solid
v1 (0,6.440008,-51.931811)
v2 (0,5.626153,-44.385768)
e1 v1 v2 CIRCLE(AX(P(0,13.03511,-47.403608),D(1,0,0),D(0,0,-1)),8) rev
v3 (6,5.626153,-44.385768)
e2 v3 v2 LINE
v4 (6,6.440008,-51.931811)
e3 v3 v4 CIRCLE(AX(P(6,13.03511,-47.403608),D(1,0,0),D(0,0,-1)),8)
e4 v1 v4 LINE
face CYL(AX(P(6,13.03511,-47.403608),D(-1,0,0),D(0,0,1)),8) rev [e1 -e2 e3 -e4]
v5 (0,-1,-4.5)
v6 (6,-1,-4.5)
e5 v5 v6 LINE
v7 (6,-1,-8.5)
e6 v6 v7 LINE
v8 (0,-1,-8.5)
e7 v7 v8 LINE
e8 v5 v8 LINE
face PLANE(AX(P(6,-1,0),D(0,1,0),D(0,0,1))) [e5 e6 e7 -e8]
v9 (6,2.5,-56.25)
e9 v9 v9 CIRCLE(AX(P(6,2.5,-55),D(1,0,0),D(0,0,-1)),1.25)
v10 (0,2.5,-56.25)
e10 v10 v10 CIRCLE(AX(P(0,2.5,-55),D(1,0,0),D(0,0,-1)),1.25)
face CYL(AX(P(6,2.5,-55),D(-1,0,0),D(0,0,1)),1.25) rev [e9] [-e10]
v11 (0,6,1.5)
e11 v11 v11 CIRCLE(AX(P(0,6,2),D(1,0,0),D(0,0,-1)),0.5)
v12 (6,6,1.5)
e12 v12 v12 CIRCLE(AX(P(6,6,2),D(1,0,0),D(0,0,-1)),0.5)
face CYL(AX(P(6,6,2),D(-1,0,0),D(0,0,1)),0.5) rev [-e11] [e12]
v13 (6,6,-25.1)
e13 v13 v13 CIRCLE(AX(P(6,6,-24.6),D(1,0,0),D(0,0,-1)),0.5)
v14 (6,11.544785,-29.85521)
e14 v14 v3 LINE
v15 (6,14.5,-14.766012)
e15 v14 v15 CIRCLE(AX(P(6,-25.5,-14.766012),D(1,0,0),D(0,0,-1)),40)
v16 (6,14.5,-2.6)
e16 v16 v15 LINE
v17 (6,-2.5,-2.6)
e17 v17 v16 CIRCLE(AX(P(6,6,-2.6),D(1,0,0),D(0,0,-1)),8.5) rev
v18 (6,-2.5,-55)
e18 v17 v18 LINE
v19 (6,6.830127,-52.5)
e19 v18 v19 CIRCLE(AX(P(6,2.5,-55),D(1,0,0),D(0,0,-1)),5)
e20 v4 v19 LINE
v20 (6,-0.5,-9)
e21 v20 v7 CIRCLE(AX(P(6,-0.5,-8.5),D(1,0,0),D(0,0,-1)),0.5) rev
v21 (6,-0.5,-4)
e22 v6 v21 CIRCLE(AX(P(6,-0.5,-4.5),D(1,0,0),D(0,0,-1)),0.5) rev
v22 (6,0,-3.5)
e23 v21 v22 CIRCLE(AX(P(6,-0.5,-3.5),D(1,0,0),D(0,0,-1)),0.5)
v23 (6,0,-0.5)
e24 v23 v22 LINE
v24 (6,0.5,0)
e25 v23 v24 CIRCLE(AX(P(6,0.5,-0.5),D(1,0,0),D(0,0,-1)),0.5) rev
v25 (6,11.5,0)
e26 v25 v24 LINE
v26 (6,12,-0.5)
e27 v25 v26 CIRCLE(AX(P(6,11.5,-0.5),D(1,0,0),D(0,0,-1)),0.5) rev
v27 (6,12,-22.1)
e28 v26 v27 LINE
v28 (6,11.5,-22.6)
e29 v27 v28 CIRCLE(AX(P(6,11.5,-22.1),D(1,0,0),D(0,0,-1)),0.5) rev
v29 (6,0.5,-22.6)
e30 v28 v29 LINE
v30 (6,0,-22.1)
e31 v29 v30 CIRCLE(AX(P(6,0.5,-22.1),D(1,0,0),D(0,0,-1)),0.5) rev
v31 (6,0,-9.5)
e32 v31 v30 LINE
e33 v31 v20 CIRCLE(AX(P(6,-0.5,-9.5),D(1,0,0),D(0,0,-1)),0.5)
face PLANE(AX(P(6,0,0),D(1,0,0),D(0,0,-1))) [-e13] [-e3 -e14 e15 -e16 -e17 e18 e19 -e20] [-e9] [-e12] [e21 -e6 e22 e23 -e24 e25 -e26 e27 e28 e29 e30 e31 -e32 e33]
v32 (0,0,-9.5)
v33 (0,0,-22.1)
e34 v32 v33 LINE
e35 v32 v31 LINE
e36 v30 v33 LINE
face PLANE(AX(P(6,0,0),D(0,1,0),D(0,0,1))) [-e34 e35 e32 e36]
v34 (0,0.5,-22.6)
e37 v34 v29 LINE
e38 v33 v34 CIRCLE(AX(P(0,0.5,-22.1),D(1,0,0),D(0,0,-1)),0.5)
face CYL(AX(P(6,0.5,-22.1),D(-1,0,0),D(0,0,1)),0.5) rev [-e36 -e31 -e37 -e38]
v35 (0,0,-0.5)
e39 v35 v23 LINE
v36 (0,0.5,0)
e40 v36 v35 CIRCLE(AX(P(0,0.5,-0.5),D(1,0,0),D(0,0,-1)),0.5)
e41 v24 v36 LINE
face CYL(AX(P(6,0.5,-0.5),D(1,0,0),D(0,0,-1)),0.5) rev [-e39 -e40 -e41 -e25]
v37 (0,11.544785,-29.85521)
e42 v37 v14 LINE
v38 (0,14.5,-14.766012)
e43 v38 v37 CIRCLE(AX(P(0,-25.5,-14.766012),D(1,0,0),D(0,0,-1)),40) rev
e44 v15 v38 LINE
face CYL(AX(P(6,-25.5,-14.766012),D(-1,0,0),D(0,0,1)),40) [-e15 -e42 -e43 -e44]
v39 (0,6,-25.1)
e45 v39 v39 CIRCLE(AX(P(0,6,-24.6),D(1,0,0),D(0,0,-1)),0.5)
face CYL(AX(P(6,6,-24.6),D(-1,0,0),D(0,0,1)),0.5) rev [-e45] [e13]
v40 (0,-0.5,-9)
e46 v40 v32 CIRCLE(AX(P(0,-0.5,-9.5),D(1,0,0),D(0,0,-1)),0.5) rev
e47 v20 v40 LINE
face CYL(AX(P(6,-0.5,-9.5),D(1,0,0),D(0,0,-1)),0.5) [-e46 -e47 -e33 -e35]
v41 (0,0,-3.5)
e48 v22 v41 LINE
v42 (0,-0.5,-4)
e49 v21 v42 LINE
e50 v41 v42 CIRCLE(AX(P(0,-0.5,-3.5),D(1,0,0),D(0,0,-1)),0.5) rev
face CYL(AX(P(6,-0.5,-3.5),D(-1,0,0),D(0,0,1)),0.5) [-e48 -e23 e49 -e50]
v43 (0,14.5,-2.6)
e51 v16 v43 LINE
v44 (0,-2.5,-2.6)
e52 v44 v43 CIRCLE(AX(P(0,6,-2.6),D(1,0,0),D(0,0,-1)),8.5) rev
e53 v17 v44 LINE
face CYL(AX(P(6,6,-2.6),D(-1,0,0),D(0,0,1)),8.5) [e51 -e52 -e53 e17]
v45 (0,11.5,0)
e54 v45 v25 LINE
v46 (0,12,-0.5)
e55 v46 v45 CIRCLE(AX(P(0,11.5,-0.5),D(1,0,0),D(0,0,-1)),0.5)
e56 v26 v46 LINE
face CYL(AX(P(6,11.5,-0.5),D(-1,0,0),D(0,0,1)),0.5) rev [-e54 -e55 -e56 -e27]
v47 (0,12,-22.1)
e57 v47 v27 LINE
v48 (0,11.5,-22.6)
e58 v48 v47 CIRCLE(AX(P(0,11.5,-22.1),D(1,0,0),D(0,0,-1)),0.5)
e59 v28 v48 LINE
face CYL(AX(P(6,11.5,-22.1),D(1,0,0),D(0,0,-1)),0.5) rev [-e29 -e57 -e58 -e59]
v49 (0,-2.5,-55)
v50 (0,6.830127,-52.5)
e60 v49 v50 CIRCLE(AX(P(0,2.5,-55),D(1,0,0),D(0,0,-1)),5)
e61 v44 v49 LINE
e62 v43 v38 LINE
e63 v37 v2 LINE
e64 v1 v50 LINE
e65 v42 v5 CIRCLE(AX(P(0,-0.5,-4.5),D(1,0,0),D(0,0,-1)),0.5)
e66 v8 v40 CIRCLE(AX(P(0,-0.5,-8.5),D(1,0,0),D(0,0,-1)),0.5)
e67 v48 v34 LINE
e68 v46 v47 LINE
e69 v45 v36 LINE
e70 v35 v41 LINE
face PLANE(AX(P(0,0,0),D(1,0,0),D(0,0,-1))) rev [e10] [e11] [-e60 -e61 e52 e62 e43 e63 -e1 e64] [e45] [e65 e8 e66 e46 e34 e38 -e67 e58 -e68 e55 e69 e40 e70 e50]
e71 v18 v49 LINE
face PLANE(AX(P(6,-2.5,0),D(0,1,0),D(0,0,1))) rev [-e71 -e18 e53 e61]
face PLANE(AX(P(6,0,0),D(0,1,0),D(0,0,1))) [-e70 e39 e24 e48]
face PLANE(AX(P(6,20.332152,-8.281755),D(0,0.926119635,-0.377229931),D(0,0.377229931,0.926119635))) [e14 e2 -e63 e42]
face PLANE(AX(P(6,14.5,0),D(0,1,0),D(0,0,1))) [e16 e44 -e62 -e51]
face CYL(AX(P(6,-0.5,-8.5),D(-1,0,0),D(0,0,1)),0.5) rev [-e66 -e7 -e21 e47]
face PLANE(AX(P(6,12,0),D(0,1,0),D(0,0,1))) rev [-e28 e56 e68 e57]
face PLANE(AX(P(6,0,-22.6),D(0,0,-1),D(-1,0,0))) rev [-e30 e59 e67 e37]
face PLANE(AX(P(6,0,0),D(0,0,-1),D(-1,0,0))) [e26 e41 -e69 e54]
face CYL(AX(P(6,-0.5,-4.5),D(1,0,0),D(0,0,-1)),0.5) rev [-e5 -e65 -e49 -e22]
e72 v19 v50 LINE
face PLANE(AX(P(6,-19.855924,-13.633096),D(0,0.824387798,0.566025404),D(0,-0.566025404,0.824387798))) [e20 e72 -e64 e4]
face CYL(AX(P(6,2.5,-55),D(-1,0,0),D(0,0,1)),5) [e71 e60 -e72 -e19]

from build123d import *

# Parameters (mm, degrees)
SCHIZZO1_R                   = 0.5
SCHIZZO1_R_2                 = 1.25
ESTRUSIONE_ESTRUSIONE1_DEPTH = 6
RACCORDO1_R                  = 8
RACCORDO2_R                  = 40
RACCORDO3_R                  = 0.5


with BuildPart() as part:
    # Schizzo1 → Estrusione-Estrusione1 (new body)
    with BuildSketch(Plane(origin=(0, 0, 0), x_dir=(0, 0, -1), z_dir=(1, 0, 0))):
        with BuildLine():
            Line((22.6, 14.5), (2.6, 14.5))
            ThreePointArc((2.6, 14.5), (-5.9, 6), (2.6, -2.5))
            Line((2.6, -2.5), (55, -2.5))
            ThreePointArc((55, -2.5), (59.829629131, 3.794095226), (52.5, 6.830127019))
            Line((52.5, 6.830127019), (48.378061008, 4))
            Line((48.378061008, 4), (22.6, 14.5))
        make_face()
        Polygon((0, 0), (0, 12), (22.6, 12), (22.6, 0), (9, 0), (9, -1), (4, -1), (4, 0), align=None, mode=Mode.SUBTRACT)
        with Locations((-2, 6)):
            Circle(SCHIZZO1_R, mode=Mode.SUBTRACT)
        with Locations((24.6, 6)):
            Circle(SCHIZZO1_R, mode=Mode.SUBTRACT)
        with Locations((55, 2.5)):
            Circle(SCHIZZO1_R_2, mode=Mode.SUBTRACT)
    extrude(amount=ESTRUSIONE_ESTRUSIONE1_DEPTH)

    # Raccordo1
    raccordo1_edges = [part.edges().sort_by_distance(p)[0] for p in [
        (3, 4, -48.378061008),
    ]]
    fillet(raccordo1_edges, radius=RACCORDO1_R)

    # Raccordo2
    raccordo2_edges = [part.edges().sort_by_distance(p)[0] for p in [
        (3, 14.5, -22.6),
    ]]
    fillet(raccordo2_edges, radius=RACCORDO2_R)

    # Raccordo3
    raccordo3_edges = [part.edges().sort_by_distance(p)[0] for p in [
        (3, 0, -22.6),
        (3, 0, 0),
        (3, 12, 0),
        (3, 12, -22.6),
        (3, 0, -4),
        (3, -1, -4),
        (3, -1, -9),
        (3, 0, -9),
    ]]
    fillet(raccordo3_edges, radius=RACCORDO3_R - 0.0001)  # a hair under: the kernel refuses the full size


solid = part.part
